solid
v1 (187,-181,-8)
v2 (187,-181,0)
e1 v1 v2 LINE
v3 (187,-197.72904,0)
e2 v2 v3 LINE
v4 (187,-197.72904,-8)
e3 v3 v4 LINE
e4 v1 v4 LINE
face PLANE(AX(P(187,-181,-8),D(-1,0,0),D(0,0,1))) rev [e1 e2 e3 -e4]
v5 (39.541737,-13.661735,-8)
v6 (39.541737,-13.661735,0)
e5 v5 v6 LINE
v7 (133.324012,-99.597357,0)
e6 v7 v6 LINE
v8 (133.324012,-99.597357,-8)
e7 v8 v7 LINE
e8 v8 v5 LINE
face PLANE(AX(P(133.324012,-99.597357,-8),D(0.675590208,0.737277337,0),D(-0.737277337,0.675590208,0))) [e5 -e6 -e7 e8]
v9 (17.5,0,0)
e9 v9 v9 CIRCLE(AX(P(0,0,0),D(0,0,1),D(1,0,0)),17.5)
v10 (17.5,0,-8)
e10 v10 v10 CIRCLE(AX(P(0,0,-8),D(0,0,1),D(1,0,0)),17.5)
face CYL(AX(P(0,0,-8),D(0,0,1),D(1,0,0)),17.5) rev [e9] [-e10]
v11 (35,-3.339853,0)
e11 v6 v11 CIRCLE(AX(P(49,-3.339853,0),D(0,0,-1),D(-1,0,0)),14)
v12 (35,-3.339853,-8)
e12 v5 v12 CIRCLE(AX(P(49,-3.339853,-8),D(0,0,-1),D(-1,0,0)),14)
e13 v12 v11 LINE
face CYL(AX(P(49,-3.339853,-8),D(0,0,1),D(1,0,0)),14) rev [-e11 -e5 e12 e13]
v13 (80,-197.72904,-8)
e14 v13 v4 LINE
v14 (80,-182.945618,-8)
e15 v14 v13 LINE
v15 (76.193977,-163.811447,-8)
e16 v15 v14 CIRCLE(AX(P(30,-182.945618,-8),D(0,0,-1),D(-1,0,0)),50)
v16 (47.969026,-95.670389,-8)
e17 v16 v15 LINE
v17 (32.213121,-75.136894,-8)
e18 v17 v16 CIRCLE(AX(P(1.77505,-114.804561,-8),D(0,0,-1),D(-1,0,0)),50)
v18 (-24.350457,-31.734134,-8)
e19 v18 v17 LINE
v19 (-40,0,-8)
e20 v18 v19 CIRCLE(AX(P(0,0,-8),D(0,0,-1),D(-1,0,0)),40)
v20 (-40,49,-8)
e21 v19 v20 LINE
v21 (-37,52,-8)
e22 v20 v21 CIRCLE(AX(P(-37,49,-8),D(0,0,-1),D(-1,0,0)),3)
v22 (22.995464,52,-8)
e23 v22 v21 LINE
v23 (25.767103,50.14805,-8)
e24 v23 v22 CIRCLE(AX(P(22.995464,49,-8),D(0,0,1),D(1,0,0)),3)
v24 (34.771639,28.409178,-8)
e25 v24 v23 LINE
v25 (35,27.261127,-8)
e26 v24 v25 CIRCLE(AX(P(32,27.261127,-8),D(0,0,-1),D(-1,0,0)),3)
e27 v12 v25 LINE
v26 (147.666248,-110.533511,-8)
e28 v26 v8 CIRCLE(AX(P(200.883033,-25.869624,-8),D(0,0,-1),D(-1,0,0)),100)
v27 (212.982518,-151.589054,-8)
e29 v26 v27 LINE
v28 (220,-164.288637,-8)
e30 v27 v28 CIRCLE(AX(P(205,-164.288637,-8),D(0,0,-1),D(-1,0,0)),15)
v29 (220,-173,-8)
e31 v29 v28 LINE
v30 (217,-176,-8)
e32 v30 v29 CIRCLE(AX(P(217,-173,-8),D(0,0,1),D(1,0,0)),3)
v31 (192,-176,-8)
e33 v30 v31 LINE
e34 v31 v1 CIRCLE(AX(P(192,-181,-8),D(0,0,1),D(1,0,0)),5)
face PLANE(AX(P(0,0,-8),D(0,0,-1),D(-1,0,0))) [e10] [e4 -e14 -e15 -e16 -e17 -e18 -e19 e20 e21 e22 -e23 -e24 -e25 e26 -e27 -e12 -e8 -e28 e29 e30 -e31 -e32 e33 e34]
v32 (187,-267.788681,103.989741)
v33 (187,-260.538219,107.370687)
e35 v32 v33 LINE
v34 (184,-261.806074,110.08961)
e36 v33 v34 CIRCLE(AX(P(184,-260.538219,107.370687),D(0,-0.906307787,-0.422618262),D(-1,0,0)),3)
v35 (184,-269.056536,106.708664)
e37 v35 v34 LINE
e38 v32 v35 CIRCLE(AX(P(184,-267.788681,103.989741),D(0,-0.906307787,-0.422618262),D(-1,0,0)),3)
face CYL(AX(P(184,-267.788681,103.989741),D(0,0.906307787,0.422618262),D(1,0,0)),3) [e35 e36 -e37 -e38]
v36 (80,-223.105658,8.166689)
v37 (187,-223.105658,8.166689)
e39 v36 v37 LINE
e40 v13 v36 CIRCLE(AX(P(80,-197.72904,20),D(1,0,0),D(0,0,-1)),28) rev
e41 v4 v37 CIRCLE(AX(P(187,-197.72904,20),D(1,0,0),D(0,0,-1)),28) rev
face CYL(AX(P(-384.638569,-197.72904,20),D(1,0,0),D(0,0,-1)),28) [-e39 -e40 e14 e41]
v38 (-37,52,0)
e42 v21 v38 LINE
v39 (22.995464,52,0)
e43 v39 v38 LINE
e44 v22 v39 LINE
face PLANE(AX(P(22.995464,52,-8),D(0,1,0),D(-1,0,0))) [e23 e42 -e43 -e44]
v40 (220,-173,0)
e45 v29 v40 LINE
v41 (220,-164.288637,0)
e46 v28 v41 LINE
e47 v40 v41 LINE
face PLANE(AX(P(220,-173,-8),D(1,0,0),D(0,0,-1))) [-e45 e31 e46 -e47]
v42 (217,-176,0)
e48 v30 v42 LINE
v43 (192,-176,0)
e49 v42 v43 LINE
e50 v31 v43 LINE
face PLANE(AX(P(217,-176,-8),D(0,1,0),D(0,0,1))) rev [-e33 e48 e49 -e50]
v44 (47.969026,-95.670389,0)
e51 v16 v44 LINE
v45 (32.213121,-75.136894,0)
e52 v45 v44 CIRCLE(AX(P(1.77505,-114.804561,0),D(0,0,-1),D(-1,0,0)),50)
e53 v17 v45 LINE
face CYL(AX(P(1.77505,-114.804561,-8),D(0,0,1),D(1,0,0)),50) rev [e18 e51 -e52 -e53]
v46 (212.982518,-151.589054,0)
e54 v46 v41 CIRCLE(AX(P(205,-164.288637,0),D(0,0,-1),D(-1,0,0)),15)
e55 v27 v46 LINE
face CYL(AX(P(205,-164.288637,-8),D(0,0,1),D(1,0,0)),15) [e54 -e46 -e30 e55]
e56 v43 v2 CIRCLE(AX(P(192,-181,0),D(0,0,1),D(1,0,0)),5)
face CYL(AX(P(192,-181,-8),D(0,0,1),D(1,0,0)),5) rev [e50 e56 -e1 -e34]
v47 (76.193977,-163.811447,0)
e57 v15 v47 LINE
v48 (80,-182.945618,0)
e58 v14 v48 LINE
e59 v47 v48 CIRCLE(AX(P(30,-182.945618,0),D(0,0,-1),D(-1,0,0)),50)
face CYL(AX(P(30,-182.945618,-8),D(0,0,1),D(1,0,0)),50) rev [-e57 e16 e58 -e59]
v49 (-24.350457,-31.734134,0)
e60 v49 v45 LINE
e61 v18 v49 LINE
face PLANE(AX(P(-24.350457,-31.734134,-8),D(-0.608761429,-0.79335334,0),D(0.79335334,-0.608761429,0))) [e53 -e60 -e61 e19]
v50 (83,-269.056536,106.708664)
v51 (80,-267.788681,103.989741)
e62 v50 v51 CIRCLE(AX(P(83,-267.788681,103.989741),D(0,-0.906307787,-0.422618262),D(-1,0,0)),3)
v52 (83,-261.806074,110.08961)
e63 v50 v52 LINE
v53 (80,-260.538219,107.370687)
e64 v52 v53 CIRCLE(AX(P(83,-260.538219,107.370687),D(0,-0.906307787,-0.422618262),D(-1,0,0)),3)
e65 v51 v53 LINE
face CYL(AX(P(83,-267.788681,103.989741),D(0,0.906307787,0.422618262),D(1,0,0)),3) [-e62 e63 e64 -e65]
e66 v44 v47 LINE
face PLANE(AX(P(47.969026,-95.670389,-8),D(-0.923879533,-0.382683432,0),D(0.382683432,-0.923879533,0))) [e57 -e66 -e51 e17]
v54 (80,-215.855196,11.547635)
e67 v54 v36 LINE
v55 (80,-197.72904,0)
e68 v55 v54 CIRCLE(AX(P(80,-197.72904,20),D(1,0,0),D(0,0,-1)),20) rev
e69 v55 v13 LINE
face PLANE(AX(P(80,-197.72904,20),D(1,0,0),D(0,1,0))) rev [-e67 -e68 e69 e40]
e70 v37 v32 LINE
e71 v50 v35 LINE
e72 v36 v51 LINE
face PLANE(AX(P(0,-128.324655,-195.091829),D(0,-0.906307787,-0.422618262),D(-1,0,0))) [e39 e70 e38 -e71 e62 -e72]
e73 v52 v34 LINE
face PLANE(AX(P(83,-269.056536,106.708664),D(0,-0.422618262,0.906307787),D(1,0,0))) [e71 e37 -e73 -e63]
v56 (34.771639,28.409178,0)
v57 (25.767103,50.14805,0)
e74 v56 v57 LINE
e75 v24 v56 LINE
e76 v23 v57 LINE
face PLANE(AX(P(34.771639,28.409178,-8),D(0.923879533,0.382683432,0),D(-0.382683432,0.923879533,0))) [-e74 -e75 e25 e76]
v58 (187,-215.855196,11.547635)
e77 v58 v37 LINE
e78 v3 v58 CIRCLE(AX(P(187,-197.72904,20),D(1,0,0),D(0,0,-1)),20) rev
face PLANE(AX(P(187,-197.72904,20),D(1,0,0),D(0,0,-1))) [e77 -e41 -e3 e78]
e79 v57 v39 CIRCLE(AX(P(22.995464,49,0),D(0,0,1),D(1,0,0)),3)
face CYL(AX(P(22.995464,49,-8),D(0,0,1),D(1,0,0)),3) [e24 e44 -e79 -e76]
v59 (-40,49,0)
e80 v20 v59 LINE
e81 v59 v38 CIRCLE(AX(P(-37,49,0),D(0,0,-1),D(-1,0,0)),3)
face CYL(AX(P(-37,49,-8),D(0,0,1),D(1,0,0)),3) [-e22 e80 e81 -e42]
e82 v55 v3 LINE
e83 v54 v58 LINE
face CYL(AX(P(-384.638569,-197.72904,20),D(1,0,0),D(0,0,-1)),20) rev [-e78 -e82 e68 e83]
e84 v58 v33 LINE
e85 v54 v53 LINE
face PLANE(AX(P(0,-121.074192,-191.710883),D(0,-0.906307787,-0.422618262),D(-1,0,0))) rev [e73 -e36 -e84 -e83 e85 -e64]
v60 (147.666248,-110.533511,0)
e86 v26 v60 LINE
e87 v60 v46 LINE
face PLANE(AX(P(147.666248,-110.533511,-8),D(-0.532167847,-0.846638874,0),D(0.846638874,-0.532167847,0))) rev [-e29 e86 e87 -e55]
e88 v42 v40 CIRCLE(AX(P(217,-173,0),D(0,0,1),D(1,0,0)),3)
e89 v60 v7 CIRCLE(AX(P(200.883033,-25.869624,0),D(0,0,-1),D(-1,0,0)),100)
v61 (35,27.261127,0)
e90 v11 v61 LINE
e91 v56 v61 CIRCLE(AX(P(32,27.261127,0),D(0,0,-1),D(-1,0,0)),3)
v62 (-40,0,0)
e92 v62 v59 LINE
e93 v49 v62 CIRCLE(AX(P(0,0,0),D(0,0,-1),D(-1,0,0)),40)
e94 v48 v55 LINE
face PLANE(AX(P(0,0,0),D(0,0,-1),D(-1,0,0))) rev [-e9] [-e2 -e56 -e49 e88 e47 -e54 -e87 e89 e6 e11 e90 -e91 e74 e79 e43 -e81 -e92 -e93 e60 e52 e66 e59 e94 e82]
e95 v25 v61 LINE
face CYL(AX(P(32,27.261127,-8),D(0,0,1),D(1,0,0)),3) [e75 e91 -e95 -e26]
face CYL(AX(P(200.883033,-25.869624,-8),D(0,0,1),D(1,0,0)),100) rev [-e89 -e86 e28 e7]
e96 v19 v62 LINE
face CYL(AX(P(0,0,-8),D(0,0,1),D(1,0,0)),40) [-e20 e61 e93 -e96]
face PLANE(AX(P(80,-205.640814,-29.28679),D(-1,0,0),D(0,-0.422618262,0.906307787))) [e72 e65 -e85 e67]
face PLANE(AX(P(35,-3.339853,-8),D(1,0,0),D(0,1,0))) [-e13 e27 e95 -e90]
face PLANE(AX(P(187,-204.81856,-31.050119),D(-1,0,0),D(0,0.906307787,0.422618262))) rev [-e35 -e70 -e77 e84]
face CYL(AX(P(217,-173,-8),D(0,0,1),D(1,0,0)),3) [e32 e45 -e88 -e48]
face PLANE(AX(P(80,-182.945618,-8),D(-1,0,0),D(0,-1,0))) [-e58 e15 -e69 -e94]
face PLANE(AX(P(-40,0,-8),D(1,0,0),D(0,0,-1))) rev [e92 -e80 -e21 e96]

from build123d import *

# Parameters (mm, degrees)
SKETCH1_R              = 17.5
BASE_EXTRUDE_DEPTH     = 8
PROCESS_BENDS2_START   = 80
PROCESS_BENDS2_DEPTH   = 107
PROCESS_BENDS2_2_DEPTH = 107
PROCESS_BENDS2_START_2 = -200
PROCESS_BENDS2_3_DEPTH = 34.194961468


with BuildPart() as part:
    # Sketch1 → Base-Extrude (new body)
    with BuildSketch(Plane.XY):
        with BuildLine():
            Line((-24.35045716, -31.734133612), (32.213121298, -75.1368939))
            ThreePointArc((32.213121298, -75.1368939), (41.442716862, -84.366489464), (47.969026473, -95.670389296))
            Line((47.969026473, -95.670389296), (76.193976626, -163.811446751))
            ThreePointArc((76.193976626, -163.811446751), (79.03926402, -173.191102268), (80, -182.945618369))
            Line((80, -182.945618369), (80, -330))
            ThreePointArc((80, -330), (80.878679656, -332.121320344), (83, -333))
            Line((83, -333), (184, -333))
            ThreePointArc((184, -333), (186.121320344, -332.121320344), (187, -330))
            Line((187, -330), (187, -181))
            ThreePointArc((187, -181), (188.464466094, -177.464466094), (192, -176))
            Line((192, -176), (217, -176))
            ThreePointArc((217, -176), (219.121320344, -175.121320344), (220, -173))
            Line((220, -173), (220, -164.288637004))
            ThreePointArc((220, -164.288637004), (218.128933039, -157.033906323), (212.9825177, -151.589053894))
            Line((212.9825177, -151.589053894), (147.666248084, -110.53351106))
            ThreePointArc((147.666248084, -110.53351106), (140.248070405, -105.389440946), (133.324011991, -99.597357342))
            Line((133.324011991, -99.597357342), (39.541737093, -13.661735283))
            ThreePointArc((39.541737093, -13.661735283), (36.185639292, -8.978306226), (35, -3.339852568))
            Line((35, -3.339852568), (35, 27.261127274))
            ThreePointArc((35, 27.261127274), (34.942355841, 27.84639824), (34.771638598, 28.409177571))
            Line((34.771638598, 28.409177571), (25.767102684, 50.148050297))
            ThreePointArc((25.767102684, 50.148050297), (24.662174785, 51.494408837), (22.995464086, 52))
            Line((22.995464086, 52), (-37, 52))
            ThreePointArc((-37, 52), (-39.121320344, 51.121320344), (-40, 49))
            Line((-40, 49), (-40, 0))
            ThreePointArc((-40, 0), (-35.874909661, -17.691547609), (-24.35045716, -31.734133612))
        make_face()
        Circle(SKETCH1_R, mode=Mode.SUBTRACT)
    extrude(amount=-BASE_EXTRUDE_DEPTH)

    # Process-Bends2: read off the stored shape, not the designer's step
    # Process-Bends2 outline → Process-Bends2 (cut)
    with BuildSketch(Plane.YZ.offset(PROCESS_BENDS2_START)):
        with BuildLine():
            ThreePointArc((-197.729039967, -8), (-208.312045211, -5.922962794), (-217.324957909, 0))
            Line((-217.324957909, 0), (-333, 0))
            Line((-333, 0), (-333, -8))
            Line((-333, -8), (-197.729039967, -8))
        make_face()
    extrude(amount=PROCESS_BENDS2_DEPTH, mode=Mode.SUBTRACT)

    # Process-Bends2 2 outline → Process-Bends2 2 (add)
    with BuildSketch(Plane.YZ.offset(PROCESS_BENDS2_START)):
        with BuildLine():
            Line((-215.855195707, 11.547634765), (-261.806073579, 110.089610364))
            Line((-261.806073579, 110.089610364), (-269.056535875, 106.70866427))
            Line((-269.056535875, 106.70866427), (-223.105658004, 8.166688671))
            ThreePointArc((-223.105658004, 8.166688671), (-220.583053817, 3.823039502), (-217.324957909, 0))
            Line((-217.324957909, 0), (-197.729039967, 0))
            ThreePointArc((-197.729039967, 0), (-208.475032134, 3.132171084), (-215.855195707, 11.547634765))
        make_face()
    extrude(amount=PROCESS_BENDS2_2_DEPTH)

    # Process-Bends2 3 outline → Process-Bends2 3 (cut)
    with BuildSketch(Plane(origin=(0, 0, 0), x_dir=(1, 0, 0), z_dir=(0, 0.9063077870366512, 0.42261826174069705)).offset(PROCESS_BENDS2_START_2)):
        with BuildLine():
            Line((80, -210.419098874), (83, -210.419098874))
            ThreePointArc((83, -210.419098874), (80.878679657, -209.540419218), (80, -207.419098874))
            Line((80, -207.419098874), (80, -210.419098874))
        make_face()
        with BuildLine():
            ThreePointArc((187, -207.419098874), (186.121320343, -209.540419218), (184, -210.419098874))
            Line((184, -210.419098874), (187, -210.419098874))
            Line((187, -210.419098874), (187, -207.419098874))
        make_face()
    extrude(amount=PROCESS_BENDS2_3_DEPTH, mode=Mode.SUBTRACT)


solid = part.part
